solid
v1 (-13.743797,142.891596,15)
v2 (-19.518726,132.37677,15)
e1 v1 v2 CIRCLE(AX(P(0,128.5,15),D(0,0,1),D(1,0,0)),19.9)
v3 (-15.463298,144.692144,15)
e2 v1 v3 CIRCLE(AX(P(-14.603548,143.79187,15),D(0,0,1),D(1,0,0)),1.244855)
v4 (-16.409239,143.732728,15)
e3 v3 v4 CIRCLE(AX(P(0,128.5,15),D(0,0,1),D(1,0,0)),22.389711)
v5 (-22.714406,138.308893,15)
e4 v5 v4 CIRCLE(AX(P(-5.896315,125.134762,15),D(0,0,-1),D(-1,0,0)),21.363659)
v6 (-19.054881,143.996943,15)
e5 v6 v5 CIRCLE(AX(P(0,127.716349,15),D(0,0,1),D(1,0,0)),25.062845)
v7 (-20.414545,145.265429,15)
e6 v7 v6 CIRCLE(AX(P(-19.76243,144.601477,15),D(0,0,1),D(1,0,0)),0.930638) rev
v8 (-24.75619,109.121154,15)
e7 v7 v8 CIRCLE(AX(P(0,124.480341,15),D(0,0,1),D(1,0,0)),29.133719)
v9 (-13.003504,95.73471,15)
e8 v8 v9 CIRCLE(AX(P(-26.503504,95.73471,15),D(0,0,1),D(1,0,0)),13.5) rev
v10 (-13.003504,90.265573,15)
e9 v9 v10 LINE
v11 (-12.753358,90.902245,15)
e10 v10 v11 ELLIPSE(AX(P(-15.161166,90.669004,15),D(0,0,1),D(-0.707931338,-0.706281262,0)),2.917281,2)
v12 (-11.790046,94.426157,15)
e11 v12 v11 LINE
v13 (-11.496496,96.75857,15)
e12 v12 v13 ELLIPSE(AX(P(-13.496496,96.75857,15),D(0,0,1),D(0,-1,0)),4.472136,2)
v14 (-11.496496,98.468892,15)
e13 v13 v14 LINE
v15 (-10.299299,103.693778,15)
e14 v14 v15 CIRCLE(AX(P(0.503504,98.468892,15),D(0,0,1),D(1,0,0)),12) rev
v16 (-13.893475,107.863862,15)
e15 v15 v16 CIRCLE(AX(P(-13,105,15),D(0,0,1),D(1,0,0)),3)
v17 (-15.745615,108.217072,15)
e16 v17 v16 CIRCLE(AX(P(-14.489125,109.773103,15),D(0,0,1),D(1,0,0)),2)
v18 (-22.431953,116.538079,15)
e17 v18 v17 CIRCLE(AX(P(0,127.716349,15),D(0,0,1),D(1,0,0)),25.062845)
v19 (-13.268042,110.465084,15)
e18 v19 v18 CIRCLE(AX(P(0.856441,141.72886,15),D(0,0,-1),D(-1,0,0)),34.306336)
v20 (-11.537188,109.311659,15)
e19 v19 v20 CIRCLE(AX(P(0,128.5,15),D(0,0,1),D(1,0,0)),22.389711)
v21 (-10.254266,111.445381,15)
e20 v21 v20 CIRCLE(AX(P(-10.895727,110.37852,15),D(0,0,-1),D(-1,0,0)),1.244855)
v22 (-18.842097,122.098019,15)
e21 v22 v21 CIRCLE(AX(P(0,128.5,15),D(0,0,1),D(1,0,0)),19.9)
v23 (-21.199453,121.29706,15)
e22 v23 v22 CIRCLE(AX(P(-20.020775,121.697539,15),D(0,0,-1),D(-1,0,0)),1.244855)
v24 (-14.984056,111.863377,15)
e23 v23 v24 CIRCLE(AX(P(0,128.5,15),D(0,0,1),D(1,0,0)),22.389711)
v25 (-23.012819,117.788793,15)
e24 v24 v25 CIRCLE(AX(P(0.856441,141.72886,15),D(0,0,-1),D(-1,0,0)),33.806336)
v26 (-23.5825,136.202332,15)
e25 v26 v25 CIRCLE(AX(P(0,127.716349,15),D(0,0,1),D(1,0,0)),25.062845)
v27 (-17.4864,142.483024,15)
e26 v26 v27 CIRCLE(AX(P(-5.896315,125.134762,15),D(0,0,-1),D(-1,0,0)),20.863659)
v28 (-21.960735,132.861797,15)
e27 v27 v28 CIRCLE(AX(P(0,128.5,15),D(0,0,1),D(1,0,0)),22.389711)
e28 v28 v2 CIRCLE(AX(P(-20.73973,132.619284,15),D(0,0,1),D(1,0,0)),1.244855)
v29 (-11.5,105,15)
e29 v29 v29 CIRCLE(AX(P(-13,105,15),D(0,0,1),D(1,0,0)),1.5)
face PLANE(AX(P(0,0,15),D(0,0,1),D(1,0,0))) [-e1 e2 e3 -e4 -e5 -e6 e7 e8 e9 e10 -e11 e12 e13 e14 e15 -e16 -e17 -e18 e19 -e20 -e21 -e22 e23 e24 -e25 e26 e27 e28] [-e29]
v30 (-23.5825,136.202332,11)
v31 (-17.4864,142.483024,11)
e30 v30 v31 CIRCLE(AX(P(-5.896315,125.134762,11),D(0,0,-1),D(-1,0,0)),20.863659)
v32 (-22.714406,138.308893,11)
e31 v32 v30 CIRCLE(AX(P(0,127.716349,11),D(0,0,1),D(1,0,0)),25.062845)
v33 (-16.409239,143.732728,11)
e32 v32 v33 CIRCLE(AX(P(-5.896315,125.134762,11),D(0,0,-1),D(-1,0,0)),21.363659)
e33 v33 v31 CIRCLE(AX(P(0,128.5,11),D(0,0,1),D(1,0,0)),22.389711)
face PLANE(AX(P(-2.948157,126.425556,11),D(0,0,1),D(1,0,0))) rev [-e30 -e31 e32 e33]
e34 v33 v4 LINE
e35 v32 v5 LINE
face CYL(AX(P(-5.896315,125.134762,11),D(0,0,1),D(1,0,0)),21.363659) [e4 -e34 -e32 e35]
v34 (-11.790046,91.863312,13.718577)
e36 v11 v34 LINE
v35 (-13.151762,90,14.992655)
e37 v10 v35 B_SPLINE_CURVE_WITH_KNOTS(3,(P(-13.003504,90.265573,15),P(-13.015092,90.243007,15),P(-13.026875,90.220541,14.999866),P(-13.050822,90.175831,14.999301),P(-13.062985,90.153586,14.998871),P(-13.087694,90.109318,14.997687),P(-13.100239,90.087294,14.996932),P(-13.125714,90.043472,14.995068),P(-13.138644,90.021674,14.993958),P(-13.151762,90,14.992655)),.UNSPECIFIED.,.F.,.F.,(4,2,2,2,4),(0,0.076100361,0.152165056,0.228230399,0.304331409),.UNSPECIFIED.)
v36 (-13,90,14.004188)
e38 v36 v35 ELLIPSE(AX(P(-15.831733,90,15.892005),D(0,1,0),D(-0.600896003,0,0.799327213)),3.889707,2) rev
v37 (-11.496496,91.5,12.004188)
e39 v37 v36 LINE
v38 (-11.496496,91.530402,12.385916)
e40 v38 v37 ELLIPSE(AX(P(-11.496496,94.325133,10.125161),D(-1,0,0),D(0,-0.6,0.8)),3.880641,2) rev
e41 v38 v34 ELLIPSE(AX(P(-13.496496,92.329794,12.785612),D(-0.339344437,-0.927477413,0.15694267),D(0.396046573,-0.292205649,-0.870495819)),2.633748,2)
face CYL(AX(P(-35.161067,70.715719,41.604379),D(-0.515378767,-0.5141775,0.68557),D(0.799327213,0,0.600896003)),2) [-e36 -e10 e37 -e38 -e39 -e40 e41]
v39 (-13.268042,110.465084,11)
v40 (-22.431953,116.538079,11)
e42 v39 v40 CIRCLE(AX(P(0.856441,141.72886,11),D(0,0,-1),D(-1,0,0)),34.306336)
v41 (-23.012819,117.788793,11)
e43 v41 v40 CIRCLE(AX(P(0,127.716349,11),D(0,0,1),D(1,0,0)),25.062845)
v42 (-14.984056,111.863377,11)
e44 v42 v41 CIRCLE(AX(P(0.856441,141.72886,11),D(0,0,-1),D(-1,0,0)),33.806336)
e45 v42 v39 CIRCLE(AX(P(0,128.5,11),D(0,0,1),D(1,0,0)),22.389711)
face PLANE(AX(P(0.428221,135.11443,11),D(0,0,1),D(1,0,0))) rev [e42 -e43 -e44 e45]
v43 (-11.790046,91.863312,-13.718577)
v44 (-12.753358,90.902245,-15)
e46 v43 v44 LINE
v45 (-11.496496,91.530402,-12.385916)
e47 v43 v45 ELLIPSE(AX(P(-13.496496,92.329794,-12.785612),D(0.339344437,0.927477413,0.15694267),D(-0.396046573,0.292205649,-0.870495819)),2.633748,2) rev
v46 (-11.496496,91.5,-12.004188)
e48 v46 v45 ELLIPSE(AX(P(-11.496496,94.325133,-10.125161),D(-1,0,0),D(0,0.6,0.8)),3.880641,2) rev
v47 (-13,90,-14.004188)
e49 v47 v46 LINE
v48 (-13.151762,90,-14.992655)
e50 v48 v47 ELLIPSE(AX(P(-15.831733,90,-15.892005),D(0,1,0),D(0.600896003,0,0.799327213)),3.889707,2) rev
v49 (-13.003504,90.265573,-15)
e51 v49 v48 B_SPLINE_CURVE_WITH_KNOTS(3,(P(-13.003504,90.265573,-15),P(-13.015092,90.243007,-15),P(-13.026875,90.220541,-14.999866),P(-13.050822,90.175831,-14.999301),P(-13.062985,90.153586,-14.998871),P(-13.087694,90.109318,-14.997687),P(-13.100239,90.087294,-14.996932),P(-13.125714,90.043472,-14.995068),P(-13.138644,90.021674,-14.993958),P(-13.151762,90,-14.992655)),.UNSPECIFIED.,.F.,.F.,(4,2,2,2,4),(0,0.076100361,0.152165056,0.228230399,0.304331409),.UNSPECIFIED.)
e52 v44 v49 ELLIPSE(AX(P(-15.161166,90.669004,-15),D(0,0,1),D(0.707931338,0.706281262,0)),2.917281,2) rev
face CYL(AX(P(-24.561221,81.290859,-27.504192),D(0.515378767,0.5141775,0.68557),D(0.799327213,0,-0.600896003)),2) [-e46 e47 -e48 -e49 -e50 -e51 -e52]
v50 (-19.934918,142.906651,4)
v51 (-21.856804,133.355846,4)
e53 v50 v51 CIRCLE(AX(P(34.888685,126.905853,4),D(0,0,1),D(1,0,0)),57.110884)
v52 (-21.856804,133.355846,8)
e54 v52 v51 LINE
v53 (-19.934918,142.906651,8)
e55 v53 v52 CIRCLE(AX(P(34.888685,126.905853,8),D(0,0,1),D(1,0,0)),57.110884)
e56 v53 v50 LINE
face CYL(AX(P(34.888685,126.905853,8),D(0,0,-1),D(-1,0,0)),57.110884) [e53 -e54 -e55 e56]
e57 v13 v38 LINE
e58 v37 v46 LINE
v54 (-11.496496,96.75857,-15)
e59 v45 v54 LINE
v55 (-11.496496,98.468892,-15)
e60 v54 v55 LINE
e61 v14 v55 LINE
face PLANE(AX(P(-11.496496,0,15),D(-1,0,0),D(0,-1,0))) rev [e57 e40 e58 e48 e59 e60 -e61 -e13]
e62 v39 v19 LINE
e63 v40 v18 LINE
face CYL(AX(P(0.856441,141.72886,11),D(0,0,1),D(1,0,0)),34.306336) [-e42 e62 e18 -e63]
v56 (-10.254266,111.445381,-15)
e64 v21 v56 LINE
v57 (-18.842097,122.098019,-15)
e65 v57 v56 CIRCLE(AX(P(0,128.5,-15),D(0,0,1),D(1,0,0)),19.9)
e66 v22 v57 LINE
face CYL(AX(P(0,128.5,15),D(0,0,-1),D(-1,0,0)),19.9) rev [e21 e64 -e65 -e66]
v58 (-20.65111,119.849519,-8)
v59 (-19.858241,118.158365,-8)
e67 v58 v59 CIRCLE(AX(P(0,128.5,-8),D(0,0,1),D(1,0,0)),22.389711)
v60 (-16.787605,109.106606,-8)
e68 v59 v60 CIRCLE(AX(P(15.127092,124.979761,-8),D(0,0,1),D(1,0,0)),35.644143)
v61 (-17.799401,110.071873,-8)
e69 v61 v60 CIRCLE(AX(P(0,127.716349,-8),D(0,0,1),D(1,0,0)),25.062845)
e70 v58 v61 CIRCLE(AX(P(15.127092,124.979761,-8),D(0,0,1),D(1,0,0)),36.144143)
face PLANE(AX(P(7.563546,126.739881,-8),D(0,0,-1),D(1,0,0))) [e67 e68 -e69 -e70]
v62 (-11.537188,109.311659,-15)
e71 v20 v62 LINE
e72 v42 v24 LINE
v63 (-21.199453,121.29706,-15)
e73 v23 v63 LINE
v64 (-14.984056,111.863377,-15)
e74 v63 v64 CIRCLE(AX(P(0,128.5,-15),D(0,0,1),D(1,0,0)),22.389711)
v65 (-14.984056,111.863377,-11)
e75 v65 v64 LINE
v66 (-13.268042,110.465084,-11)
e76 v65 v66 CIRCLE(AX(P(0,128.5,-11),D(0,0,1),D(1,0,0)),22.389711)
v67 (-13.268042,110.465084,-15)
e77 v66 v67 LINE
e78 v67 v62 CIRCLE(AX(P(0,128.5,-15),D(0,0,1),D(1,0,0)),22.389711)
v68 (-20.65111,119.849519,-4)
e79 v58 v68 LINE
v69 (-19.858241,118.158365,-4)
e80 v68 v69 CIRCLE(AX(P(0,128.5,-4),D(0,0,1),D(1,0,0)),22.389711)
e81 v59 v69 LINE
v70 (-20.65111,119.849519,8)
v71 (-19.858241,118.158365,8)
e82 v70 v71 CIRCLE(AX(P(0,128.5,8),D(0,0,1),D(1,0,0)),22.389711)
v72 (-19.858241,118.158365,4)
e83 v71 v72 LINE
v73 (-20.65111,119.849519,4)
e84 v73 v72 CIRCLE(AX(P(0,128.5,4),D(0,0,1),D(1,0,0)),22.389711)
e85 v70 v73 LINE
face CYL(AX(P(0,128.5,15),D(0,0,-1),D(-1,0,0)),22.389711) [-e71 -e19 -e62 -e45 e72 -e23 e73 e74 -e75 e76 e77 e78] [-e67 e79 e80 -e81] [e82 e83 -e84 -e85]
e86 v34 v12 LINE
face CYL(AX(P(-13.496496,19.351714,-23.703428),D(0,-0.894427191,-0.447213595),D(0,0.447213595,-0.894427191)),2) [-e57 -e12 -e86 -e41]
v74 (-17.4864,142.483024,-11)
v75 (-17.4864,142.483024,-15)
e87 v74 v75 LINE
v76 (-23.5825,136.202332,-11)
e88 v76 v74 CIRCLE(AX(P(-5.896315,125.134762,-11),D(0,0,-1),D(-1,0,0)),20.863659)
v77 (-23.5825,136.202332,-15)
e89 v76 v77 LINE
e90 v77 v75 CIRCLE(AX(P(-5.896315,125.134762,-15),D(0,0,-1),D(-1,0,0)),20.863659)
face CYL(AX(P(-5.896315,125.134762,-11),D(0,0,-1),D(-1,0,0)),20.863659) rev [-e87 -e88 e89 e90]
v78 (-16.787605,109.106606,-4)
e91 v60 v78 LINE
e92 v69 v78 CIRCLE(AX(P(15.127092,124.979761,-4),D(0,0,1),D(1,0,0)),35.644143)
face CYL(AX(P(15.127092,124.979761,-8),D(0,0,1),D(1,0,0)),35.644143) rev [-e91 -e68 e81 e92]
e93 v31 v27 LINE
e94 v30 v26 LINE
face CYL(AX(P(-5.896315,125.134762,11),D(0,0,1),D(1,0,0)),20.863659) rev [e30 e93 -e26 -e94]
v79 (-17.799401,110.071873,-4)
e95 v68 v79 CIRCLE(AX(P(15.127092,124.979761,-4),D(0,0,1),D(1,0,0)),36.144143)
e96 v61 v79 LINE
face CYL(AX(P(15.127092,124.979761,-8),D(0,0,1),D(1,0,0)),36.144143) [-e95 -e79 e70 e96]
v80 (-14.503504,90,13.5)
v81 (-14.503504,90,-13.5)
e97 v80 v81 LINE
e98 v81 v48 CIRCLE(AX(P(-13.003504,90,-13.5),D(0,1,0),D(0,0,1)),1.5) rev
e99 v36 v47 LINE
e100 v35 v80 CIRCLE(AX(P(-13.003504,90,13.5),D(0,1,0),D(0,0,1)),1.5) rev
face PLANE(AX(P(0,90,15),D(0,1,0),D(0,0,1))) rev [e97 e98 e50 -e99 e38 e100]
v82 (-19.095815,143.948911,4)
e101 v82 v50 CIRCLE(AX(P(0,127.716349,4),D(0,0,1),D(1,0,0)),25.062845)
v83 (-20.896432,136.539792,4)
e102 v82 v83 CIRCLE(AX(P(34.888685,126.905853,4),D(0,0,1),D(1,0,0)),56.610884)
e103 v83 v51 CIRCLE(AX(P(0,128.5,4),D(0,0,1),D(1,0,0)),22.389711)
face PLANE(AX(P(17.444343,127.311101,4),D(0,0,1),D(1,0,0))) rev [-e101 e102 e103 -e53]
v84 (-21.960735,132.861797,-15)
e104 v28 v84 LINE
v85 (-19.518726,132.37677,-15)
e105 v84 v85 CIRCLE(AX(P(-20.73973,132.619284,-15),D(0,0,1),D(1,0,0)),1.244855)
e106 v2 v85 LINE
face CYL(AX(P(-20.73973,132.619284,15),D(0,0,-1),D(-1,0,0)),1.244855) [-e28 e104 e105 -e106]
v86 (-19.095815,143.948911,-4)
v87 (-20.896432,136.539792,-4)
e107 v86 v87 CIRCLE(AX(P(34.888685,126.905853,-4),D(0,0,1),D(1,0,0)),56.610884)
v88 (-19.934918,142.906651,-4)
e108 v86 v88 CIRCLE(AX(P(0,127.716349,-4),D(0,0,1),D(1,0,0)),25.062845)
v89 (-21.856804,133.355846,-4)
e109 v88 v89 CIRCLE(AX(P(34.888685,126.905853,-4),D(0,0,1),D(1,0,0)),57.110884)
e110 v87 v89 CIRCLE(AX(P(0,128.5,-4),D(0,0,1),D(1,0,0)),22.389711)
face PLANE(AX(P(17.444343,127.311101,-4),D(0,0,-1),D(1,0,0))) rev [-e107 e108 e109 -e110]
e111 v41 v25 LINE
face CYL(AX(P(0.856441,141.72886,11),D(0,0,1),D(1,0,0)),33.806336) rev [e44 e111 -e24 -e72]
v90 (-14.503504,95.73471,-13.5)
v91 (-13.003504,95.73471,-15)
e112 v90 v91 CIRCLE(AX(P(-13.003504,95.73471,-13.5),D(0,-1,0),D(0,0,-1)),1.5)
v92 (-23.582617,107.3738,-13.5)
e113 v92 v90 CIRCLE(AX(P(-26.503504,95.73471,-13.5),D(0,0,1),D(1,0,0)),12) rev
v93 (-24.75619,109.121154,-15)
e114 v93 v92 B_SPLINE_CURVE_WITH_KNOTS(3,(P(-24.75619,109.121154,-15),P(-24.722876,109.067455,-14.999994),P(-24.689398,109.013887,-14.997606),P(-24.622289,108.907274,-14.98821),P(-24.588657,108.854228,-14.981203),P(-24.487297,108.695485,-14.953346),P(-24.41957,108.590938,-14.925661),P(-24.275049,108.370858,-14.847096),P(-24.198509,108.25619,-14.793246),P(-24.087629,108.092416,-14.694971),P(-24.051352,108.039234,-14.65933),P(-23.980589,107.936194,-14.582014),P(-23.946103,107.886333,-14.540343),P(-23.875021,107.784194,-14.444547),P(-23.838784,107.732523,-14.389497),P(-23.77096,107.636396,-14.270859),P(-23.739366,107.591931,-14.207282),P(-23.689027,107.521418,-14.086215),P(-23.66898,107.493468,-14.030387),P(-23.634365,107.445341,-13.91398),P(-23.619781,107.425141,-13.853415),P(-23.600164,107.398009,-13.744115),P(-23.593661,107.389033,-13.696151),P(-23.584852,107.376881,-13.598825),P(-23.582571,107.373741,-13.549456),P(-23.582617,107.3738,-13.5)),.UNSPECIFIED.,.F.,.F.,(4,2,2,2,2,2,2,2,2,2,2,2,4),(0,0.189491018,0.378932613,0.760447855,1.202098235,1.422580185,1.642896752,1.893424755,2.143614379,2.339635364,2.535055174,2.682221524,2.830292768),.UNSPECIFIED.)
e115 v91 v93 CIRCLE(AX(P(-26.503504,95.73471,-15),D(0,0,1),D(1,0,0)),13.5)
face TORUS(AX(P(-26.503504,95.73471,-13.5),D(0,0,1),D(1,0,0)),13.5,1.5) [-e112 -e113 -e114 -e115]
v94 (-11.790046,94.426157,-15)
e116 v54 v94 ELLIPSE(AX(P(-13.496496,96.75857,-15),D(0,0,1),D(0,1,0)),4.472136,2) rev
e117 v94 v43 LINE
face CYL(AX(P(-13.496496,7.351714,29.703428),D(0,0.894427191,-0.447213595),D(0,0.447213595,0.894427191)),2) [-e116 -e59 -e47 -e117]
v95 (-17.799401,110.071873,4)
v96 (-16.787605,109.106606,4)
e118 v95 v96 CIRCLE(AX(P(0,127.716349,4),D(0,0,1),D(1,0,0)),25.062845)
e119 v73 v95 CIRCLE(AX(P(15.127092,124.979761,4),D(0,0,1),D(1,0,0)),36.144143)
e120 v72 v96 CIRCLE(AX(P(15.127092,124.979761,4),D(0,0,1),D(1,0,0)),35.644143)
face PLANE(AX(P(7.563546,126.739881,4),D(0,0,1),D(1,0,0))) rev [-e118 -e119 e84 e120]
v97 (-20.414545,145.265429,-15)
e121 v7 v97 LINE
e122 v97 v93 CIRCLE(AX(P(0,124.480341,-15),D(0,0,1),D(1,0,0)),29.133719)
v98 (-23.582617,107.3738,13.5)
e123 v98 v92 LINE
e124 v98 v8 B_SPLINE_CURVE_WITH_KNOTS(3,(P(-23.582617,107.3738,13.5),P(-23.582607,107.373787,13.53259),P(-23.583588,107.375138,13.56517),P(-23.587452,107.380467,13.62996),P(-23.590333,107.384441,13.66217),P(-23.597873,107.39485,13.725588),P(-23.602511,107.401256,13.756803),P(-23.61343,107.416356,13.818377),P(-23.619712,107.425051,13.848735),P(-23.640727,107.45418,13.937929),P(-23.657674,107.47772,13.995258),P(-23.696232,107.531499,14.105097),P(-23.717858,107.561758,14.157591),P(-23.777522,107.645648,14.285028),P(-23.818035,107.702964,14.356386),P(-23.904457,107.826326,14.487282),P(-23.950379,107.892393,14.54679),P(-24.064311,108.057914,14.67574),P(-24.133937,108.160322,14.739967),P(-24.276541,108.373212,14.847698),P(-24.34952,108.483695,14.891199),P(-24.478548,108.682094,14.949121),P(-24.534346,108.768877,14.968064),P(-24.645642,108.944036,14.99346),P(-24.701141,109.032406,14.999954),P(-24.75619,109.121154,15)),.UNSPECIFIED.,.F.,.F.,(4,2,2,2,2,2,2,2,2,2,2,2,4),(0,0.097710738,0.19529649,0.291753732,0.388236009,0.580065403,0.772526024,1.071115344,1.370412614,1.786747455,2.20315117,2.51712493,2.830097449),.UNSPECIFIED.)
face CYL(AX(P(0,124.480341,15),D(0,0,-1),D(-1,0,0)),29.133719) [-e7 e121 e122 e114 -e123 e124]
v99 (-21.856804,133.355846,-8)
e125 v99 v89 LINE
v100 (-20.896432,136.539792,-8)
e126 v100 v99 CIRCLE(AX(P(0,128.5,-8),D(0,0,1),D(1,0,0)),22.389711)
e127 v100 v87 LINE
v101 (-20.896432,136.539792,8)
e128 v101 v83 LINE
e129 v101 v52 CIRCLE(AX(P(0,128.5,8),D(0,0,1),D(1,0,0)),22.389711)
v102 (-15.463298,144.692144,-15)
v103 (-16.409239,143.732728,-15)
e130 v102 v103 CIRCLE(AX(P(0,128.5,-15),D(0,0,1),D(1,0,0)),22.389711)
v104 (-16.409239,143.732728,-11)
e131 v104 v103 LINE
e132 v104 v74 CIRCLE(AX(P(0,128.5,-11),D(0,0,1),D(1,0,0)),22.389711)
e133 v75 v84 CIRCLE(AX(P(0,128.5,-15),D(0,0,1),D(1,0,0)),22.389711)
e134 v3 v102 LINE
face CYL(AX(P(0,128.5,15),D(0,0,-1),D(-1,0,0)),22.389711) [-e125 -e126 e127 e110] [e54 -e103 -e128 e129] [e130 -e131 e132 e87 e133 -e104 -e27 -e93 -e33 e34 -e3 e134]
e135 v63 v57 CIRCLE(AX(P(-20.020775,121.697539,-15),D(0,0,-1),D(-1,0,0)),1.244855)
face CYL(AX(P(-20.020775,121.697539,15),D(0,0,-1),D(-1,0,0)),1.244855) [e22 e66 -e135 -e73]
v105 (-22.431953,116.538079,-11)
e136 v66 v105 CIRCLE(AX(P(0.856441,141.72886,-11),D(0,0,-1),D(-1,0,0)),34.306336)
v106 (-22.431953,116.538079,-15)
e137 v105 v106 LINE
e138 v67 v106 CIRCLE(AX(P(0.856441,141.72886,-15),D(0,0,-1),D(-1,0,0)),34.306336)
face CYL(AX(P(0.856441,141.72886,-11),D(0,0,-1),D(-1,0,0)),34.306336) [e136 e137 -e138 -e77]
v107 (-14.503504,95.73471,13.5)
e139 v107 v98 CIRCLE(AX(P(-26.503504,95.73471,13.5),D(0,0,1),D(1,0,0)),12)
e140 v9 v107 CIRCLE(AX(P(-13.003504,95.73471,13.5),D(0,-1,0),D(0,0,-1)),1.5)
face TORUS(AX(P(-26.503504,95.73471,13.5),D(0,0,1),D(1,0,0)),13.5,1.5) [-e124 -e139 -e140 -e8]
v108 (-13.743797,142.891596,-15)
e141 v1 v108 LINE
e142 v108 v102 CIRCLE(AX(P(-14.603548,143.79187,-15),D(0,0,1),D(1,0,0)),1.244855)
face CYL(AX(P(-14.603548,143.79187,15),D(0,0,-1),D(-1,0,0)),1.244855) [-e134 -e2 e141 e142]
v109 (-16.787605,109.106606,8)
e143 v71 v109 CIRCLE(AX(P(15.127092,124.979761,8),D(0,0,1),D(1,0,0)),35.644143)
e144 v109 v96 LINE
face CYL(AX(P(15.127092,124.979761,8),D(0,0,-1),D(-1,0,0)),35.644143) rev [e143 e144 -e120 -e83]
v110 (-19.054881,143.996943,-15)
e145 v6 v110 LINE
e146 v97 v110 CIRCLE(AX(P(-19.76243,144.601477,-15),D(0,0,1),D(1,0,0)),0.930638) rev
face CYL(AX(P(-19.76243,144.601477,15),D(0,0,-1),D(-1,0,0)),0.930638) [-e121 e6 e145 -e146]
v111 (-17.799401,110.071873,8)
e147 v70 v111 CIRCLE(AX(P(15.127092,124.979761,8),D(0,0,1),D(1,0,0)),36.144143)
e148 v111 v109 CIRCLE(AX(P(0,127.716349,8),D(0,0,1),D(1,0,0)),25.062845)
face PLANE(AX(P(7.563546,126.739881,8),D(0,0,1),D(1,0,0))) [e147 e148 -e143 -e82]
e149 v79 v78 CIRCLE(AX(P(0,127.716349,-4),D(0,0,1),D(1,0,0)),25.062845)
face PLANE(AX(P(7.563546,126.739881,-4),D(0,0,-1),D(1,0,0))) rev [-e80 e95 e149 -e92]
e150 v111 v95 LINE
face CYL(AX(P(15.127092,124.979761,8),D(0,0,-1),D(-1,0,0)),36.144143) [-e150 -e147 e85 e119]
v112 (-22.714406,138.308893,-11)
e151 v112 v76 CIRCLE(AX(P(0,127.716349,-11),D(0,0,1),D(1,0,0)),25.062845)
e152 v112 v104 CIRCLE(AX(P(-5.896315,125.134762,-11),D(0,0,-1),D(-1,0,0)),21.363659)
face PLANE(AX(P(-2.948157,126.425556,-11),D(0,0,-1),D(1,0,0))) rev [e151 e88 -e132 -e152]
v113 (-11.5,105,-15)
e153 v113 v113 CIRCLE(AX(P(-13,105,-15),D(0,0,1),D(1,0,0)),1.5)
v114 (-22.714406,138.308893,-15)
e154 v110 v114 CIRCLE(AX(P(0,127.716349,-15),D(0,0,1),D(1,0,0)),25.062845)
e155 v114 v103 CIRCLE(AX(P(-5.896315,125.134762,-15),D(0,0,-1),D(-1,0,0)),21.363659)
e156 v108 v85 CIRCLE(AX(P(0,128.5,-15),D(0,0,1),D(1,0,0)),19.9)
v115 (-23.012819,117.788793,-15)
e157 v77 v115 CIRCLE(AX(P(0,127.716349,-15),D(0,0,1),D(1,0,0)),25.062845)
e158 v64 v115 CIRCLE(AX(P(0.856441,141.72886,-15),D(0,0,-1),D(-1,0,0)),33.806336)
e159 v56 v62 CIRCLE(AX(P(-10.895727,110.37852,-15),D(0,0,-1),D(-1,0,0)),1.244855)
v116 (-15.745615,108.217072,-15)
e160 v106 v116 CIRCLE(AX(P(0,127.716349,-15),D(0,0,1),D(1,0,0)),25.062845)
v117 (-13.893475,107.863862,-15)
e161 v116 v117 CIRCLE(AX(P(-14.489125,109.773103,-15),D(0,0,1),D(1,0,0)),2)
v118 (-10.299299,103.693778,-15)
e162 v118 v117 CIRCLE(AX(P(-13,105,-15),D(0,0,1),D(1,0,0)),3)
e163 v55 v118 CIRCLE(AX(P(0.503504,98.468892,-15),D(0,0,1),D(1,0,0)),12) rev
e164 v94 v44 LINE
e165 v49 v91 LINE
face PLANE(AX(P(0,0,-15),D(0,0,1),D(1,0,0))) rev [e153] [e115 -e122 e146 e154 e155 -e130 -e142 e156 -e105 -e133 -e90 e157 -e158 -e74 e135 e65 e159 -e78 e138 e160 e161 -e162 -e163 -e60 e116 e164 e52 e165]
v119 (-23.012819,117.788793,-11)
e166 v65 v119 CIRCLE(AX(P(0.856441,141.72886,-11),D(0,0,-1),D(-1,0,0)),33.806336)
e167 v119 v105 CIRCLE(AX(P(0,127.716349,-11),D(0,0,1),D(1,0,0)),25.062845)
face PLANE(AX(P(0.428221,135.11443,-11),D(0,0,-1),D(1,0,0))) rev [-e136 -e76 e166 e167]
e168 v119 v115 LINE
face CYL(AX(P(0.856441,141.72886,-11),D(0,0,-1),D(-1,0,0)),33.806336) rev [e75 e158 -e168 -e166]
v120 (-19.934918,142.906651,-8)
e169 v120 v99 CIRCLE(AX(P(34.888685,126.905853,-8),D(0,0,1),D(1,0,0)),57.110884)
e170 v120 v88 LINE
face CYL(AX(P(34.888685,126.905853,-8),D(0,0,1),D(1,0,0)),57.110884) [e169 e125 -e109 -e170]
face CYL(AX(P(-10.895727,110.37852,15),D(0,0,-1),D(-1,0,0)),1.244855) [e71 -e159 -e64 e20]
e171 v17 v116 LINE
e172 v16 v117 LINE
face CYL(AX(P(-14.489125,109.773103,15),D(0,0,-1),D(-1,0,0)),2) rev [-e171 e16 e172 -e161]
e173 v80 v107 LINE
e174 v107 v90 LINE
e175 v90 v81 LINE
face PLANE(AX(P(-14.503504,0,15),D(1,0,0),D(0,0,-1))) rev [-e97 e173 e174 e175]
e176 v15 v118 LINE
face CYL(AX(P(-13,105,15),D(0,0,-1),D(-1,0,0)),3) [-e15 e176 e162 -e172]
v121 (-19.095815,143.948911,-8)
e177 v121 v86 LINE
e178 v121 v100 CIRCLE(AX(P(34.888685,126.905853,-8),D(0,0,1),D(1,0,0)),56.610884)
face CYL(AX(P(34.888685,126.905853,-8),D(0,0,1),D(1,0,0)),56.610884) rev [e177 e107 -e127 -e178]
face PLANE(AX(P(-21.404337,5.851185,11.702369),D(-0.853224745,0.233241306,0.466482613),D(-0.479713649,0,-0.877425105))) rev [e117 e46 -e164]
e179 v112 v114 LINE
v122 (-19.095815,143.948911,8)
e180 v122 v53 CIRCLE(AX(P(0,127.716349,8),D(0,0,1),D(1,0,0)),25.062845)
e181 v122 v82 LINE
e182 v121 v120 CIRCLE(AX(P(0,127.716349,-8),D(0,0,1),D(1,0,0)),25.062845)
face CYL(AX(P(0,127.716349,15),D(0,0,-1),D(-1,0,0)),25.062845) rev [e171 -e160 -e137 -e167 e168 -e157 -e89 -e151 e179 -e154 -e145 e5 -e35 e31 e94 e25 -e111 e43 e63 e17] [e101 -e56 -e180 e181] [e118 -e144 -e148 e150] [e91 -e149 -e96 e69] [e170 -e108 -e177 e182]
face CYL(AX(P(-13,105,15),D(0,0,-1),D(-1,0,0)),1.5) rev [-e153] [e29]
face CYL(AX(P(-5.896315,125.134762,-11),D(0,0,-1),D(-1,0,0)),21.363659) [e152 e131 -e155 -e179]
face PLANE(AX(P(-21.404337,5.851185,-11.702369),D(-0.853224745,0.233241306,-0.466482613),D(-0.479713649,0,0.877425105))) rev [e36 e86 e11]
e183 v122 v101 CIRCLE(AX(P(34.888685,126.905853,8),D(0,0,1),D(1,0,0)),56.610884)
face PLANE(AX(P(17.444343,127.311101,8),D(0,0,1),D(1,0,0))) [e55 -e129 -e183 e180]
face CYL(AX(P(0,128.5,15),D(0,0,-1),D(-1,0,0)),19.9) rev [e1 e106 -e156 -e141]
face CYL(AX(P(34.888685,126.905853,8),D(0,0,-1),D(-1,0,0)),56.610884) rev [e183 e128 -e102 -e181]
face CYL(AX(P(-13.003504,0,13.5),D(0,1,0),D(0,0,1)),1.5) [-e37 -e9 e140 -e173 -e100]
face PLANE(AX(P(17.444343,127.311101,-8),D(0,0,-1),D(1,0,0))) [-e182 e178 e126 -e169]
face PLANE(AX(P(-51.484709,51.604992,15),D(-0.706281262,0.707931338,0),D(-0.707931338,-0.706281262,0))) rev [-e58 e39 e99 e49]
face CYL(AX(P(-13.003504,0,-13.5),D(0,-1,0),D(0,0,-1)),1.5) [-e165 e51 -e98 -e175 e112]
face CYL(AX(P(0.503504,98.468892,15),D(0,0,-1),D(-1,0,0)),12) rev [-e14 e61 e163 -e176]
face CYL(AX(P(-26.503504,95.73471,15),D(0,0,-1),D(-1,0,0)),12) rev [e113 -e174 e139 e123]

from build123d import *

# Parameters (mm, degrees)
SKETCH4_R             = 1.5
BOSS_EXTRUDE3_DEPTH   = 15
BOSS_EXTRUDE3_2_DEPTH = 15
BOSS_EXTRUDE3_3_DEPTH = 15
BOSS_EXTRUDE23_START  = 15
BOSS_EXTRUDE23_DEPTH  = 4
BOSS_EXTRUDE24_START  = 8
BOSS_EXTRUDE24_DEPTH  = 4
FILLET2_R             = 2
FILLET1_R             = 1.5


# Read off the part's stored shape, not the designer's step: Mirror15
with BuildPart() as part:
    # Sketch4 → Boss-Extrude3 (new, symmetric)
    with BuildSketch(Plane.XY):
        with BuildLine():
            ThreePointArc((-15.745615363, 108.217071894), (-14.863780591, 107.808507644), (-13.893474834, 107.863861505))
            ThreePointArc((-13.893474834, 107.863861505), (-10.727575159, 106.958592694), (-10.299299114, 103.693778456))
            ThreePointArc((-10.299299114, 103.693778456), (-11.193367854, 101.14903756), (-11.496495568, 98.468892279))
            Line((-11.496495568, 98.468892279), (-11.496495568, 91.5))
            Line((-11.496495568, 91.5), (-13, 90))
            Line((-13, 90), (-14.503504432, 90))
            Line((-14.503504432, 90), (-14.503504432, 95.734709942))
            ThreePointArc((-14.503504432, 95.734709942), (-17.04172216, 103.115406131), (-23.582617138, 107.373800002))
            ThreePointArc((-23.582617138, 107.373800002), (-29.032421023, 126.907705171), (-20.414545428, 145.265429262))
            ThreePointArc((-20.414545428, 145.265429262), (-19.127581616, 145.281958408), (-19.054880744, 143.996943368))
            ThreePointArc((-19.054880744, 143.996943368), (-24.95633052, 125.408148717), (-15.745615363, 108.217071894))
        make_face()
        with Locations((-13, 105)):
            Circle(SKETCH4_R, mode=Mode.SUBTRACT)
    extrude(amount=BOSS_EXTRUDE3_DEPTH, both=True)



with BuildPart() as body_2:
    # Sketch4 → Boss-Extrude3 2 (new, symmetric)
    with BuildSketch(Plane.XY):
        with BuildLine():
            ThreePointArc((-15.463298435, 144.692144482), (-19.624699769, 139.278232713), (-21.960734627, 132.861797344))
            ThreePointArc((-21.960734627, 132.861797344), (-20.98224362, 131.398279383), (-19.518725659, 132.37677039))
            ThreePointArc((-19.518725659, 132.37677039), (-17.442455247, 138.079705369), (-13.743797057, 142.891596244))
            ThreePointArc((-13.743797057, 142.891596244), (-13.703273627, 144.651621052), (-15.463298435, 144.692144482))
        make_face()
    extrude(amount=BOSS_EXTRUDE3_2_DEPTH, both=True)


with BuildPart() as body_3:
    # Sketch4 → Boss-Extrude3 3 (new, symmetric)
    with BuildSketch(Plane.XY):
        with BuildLine():
            ThreePointArc((-18.842097465, 122.098018813), (-15.492555186, 116.010374953), (-10.254266127, 111.445381089))
            ThreePointArc((-10.254266127, 111.445381089), (-9.828866365, 109.737058954), (-11.5371885, 109.311659193))
            ThreePointArc((-11.5371885, 109.311659193), (-17.430845593, 114.447784397), (-21.199452745, 121.297059992))
            ThreePointArc((-21.199452745, 121.297059992), (-20.421254515, 122.876217042), (-18.842097465, 122.098018813))
        make_face()
    extrude(amount=BOSS_EXTRUDE3_3_DEPTH, both=True)


with BuildPart() as part_1:
    add(part.part)

    add(body_2.part)  # Boss-Extrude23 merges body 2

    add(body_3.part)  # Boss-Extrude23 merges body 3
    # Sketch81 → Boss-Extrude23 (add)
    with BuildSketch(Plane.XY.offset(BOSS_EXTRUDE23_START)):
        with BuildLine():
            ThreePointArc((-16.40923932, 143.732728133), (-16.959334589, 143.117801193), (-17.486399904, 142.483023987))
            ThreePointArc((-17.486399904, 142.483023987), (-20.86751312, 139.665952099), (-23.582500348, 136.202331891))
            ThreePointArc((-23.582500348, 136.202331891), (-23.172403472, 137.265482274), (-22.71440592, 138.308893232))
            ThreePointArc((-22.71440592, 138.308893232), (-19.828313947, 141.330604813), (-16.40923932, 143.732728133))
        make_face()
        with BuildLine():
            ThreePointArc((-14.984055873, 111.863377416), (-19.218265584, 114.528225057), (-23.012819409, 117.788793427))
            ThreePointArc((-23.012819409, 117.788793427), (-22.730989821, 117.159440449), (-22.431952643, 116.538079158))
            ThreePointArc((-22.431952643, 116.538079158), (-18.094842505, 113.132119318), (-13.268041623, 110.465083507))
            ThreePointArc((-13.268041623, 110.465083507), (-14.143339764, 111.14301058), (-14.984055873, 111.863377416))
        make_face()
    extrude(amount=-BOSS_EXTRUDE23_DEPTH)

    # Sketch81<4> → Boss-Extrude24 (add)
    with BuildSketch(Plane.XY.offset(BOSS_EXTRUDE24_START)):
        with BuildLine():
            ThreePointArc((-20.65110959, 119.849519429), (-20.27231766, 118.99567056), (-19.858240545, 118.158364546))
            ThreePointArc((-19.858240545, 118.158364546), (-18.627716165, 113.52909009), (-16.787605108, 109.106606226))
            ThreePointArc((-16.787605108, 109.106606226), (-17.300236642, 109.582181696), (-17.799401283, 110.071873209))
            ThreePointArc((-17.799401283, 110.071873209), (-19.571385864, 114.859745334), (-20.65110959, 119.849519429))
        make_face()
        with BuildLine():
            ThreePointArc((-19.934917917, 142.906651174), (-21.099885834, 138.172303965), (-21.85680447, 133.355845939))
            ThreePointArc((-21.85680447, 133.355845939), (-21.435815653, 134.965674653), (-20.896432339, 136.539792094))
            ThreePointArc((-20.896432339, 136.539792094), (-20.121005018, 140.27470116), (-19.095815217, 143.948911161))
            ThreePointArc((-19.095815217, 143.948911161), (-19.522323343, 143.433381929), (-19.934917917, 142.906651174))
        make_face()
    extrude(amount=-BOSS_EXTRUDE24_DEPTH)

    # SurfaceCut2: cut with a surface, the side it looks to stays
    # 3DSketch1 → Surface-Fill1: a flat surface bounded by the sketch
    with BuildSketch(Plane(origin=(-13, 90, 15), x_dir=(0.2636894274940136, 0.964607633096421, 0), z_dir=(-0.8532247447444736, 0.2332413063570551, -0.4664826127141099)), mode=Mode.PRIVATE) as surface_fill1_1_region:
        Polygon((0, 0), (5.701800205, 0), (1.843369672, 2.261086868), align=None)
    surface_fill1_1 = surface_fill1_1_region.sketch.faces()[0]
    split(bisect_by=surface_fill1_1, keep=Keep.TOP)

    # Fillet2
    fillet2_edges = [part_1.edges().sort_by_distance(p)[0] for p in [
        (-11.496495568, 93.5, 14),
        (-12.248247784, 90.75, 14),
    ]]
    fillet(fillet2_edges, radius=FILLET2_R)

    # Fillet1
    # the kernel refuses this fillet: 1.5 mm, written as the material it takes off along each edge
    with BuildSketch(Plane(origin=(-14.503504432, 86.25, 15), x_dir=(1, 0, 0), z_dir=(0, 1, 0)), Plane(origin=(-14.503504432, 86.25, -15), x_dir=(0, 0, 1), z_dir=(0, 1, 0))) as fillet1_piece_1:
        with BuildLine():
            CenterArc((FILLET1_R, FILLET1_R), FILLET1_R, 180, 90)
            Line((0, FILLET1_R), (0, 0))
            Line((0, 0), (FILLET1_R, 0))
        make_face()
    extrude(amount=9.484709942, mode=Mode.SUBTRACT)
    with BuildSketch(Plane(origin=(-26.503504432, 95.734709942, 15), x_dir=(1, 0, 0), z_dir=(0, -1, 0))) as fillet1_piece_2:
        with BuildLine():
            CenterArc((12 + FILLET1_R, -FILLET1_R), FILLET1_R, 90, 90)
            Line((12, -FILLET1_R), (12, 0))
            Line((12, 0), (12 + FILLET1_R, 0))
        make_face()
    revolve(axis=Axis((-26.503504432, 95.734709942, 15), (0, 0, 1)), revolution_arc=93.822319642, mode=Mode.SUBTRACT)
    with BuildSketch(Plane(origin=(-26.503504432, 95.734709942, -15), x_dir=(1, 0, 0), z_dir=(0, -1, 0))) as fillet1_piece_3:
        with BuildLine():
            CenterArc((12 + FILLET1_R, FILLET1_R), FILLET1_R, 180, 90)
            Line((12 + FILLET1_R, 0), (12, 0))
            Line((12, 0), (12, FILLET1_R))
        make_face()
    revolve(axis=Axis((-26.503504432, 95.734709942, -15), (0, 0, 1)), revolution_arc=93.822319642, mode=Mode.SUBTRACT)

    # Mirror15
    split(bisect_by=Plane.XY, keep=Keep.TOP)

    # Mirror15 2: part across plane


with BuildPart() as part_2:
    add(part_1.part)
    add(part_1.part.mirror(Plane.XY))


solid = part_2.part
